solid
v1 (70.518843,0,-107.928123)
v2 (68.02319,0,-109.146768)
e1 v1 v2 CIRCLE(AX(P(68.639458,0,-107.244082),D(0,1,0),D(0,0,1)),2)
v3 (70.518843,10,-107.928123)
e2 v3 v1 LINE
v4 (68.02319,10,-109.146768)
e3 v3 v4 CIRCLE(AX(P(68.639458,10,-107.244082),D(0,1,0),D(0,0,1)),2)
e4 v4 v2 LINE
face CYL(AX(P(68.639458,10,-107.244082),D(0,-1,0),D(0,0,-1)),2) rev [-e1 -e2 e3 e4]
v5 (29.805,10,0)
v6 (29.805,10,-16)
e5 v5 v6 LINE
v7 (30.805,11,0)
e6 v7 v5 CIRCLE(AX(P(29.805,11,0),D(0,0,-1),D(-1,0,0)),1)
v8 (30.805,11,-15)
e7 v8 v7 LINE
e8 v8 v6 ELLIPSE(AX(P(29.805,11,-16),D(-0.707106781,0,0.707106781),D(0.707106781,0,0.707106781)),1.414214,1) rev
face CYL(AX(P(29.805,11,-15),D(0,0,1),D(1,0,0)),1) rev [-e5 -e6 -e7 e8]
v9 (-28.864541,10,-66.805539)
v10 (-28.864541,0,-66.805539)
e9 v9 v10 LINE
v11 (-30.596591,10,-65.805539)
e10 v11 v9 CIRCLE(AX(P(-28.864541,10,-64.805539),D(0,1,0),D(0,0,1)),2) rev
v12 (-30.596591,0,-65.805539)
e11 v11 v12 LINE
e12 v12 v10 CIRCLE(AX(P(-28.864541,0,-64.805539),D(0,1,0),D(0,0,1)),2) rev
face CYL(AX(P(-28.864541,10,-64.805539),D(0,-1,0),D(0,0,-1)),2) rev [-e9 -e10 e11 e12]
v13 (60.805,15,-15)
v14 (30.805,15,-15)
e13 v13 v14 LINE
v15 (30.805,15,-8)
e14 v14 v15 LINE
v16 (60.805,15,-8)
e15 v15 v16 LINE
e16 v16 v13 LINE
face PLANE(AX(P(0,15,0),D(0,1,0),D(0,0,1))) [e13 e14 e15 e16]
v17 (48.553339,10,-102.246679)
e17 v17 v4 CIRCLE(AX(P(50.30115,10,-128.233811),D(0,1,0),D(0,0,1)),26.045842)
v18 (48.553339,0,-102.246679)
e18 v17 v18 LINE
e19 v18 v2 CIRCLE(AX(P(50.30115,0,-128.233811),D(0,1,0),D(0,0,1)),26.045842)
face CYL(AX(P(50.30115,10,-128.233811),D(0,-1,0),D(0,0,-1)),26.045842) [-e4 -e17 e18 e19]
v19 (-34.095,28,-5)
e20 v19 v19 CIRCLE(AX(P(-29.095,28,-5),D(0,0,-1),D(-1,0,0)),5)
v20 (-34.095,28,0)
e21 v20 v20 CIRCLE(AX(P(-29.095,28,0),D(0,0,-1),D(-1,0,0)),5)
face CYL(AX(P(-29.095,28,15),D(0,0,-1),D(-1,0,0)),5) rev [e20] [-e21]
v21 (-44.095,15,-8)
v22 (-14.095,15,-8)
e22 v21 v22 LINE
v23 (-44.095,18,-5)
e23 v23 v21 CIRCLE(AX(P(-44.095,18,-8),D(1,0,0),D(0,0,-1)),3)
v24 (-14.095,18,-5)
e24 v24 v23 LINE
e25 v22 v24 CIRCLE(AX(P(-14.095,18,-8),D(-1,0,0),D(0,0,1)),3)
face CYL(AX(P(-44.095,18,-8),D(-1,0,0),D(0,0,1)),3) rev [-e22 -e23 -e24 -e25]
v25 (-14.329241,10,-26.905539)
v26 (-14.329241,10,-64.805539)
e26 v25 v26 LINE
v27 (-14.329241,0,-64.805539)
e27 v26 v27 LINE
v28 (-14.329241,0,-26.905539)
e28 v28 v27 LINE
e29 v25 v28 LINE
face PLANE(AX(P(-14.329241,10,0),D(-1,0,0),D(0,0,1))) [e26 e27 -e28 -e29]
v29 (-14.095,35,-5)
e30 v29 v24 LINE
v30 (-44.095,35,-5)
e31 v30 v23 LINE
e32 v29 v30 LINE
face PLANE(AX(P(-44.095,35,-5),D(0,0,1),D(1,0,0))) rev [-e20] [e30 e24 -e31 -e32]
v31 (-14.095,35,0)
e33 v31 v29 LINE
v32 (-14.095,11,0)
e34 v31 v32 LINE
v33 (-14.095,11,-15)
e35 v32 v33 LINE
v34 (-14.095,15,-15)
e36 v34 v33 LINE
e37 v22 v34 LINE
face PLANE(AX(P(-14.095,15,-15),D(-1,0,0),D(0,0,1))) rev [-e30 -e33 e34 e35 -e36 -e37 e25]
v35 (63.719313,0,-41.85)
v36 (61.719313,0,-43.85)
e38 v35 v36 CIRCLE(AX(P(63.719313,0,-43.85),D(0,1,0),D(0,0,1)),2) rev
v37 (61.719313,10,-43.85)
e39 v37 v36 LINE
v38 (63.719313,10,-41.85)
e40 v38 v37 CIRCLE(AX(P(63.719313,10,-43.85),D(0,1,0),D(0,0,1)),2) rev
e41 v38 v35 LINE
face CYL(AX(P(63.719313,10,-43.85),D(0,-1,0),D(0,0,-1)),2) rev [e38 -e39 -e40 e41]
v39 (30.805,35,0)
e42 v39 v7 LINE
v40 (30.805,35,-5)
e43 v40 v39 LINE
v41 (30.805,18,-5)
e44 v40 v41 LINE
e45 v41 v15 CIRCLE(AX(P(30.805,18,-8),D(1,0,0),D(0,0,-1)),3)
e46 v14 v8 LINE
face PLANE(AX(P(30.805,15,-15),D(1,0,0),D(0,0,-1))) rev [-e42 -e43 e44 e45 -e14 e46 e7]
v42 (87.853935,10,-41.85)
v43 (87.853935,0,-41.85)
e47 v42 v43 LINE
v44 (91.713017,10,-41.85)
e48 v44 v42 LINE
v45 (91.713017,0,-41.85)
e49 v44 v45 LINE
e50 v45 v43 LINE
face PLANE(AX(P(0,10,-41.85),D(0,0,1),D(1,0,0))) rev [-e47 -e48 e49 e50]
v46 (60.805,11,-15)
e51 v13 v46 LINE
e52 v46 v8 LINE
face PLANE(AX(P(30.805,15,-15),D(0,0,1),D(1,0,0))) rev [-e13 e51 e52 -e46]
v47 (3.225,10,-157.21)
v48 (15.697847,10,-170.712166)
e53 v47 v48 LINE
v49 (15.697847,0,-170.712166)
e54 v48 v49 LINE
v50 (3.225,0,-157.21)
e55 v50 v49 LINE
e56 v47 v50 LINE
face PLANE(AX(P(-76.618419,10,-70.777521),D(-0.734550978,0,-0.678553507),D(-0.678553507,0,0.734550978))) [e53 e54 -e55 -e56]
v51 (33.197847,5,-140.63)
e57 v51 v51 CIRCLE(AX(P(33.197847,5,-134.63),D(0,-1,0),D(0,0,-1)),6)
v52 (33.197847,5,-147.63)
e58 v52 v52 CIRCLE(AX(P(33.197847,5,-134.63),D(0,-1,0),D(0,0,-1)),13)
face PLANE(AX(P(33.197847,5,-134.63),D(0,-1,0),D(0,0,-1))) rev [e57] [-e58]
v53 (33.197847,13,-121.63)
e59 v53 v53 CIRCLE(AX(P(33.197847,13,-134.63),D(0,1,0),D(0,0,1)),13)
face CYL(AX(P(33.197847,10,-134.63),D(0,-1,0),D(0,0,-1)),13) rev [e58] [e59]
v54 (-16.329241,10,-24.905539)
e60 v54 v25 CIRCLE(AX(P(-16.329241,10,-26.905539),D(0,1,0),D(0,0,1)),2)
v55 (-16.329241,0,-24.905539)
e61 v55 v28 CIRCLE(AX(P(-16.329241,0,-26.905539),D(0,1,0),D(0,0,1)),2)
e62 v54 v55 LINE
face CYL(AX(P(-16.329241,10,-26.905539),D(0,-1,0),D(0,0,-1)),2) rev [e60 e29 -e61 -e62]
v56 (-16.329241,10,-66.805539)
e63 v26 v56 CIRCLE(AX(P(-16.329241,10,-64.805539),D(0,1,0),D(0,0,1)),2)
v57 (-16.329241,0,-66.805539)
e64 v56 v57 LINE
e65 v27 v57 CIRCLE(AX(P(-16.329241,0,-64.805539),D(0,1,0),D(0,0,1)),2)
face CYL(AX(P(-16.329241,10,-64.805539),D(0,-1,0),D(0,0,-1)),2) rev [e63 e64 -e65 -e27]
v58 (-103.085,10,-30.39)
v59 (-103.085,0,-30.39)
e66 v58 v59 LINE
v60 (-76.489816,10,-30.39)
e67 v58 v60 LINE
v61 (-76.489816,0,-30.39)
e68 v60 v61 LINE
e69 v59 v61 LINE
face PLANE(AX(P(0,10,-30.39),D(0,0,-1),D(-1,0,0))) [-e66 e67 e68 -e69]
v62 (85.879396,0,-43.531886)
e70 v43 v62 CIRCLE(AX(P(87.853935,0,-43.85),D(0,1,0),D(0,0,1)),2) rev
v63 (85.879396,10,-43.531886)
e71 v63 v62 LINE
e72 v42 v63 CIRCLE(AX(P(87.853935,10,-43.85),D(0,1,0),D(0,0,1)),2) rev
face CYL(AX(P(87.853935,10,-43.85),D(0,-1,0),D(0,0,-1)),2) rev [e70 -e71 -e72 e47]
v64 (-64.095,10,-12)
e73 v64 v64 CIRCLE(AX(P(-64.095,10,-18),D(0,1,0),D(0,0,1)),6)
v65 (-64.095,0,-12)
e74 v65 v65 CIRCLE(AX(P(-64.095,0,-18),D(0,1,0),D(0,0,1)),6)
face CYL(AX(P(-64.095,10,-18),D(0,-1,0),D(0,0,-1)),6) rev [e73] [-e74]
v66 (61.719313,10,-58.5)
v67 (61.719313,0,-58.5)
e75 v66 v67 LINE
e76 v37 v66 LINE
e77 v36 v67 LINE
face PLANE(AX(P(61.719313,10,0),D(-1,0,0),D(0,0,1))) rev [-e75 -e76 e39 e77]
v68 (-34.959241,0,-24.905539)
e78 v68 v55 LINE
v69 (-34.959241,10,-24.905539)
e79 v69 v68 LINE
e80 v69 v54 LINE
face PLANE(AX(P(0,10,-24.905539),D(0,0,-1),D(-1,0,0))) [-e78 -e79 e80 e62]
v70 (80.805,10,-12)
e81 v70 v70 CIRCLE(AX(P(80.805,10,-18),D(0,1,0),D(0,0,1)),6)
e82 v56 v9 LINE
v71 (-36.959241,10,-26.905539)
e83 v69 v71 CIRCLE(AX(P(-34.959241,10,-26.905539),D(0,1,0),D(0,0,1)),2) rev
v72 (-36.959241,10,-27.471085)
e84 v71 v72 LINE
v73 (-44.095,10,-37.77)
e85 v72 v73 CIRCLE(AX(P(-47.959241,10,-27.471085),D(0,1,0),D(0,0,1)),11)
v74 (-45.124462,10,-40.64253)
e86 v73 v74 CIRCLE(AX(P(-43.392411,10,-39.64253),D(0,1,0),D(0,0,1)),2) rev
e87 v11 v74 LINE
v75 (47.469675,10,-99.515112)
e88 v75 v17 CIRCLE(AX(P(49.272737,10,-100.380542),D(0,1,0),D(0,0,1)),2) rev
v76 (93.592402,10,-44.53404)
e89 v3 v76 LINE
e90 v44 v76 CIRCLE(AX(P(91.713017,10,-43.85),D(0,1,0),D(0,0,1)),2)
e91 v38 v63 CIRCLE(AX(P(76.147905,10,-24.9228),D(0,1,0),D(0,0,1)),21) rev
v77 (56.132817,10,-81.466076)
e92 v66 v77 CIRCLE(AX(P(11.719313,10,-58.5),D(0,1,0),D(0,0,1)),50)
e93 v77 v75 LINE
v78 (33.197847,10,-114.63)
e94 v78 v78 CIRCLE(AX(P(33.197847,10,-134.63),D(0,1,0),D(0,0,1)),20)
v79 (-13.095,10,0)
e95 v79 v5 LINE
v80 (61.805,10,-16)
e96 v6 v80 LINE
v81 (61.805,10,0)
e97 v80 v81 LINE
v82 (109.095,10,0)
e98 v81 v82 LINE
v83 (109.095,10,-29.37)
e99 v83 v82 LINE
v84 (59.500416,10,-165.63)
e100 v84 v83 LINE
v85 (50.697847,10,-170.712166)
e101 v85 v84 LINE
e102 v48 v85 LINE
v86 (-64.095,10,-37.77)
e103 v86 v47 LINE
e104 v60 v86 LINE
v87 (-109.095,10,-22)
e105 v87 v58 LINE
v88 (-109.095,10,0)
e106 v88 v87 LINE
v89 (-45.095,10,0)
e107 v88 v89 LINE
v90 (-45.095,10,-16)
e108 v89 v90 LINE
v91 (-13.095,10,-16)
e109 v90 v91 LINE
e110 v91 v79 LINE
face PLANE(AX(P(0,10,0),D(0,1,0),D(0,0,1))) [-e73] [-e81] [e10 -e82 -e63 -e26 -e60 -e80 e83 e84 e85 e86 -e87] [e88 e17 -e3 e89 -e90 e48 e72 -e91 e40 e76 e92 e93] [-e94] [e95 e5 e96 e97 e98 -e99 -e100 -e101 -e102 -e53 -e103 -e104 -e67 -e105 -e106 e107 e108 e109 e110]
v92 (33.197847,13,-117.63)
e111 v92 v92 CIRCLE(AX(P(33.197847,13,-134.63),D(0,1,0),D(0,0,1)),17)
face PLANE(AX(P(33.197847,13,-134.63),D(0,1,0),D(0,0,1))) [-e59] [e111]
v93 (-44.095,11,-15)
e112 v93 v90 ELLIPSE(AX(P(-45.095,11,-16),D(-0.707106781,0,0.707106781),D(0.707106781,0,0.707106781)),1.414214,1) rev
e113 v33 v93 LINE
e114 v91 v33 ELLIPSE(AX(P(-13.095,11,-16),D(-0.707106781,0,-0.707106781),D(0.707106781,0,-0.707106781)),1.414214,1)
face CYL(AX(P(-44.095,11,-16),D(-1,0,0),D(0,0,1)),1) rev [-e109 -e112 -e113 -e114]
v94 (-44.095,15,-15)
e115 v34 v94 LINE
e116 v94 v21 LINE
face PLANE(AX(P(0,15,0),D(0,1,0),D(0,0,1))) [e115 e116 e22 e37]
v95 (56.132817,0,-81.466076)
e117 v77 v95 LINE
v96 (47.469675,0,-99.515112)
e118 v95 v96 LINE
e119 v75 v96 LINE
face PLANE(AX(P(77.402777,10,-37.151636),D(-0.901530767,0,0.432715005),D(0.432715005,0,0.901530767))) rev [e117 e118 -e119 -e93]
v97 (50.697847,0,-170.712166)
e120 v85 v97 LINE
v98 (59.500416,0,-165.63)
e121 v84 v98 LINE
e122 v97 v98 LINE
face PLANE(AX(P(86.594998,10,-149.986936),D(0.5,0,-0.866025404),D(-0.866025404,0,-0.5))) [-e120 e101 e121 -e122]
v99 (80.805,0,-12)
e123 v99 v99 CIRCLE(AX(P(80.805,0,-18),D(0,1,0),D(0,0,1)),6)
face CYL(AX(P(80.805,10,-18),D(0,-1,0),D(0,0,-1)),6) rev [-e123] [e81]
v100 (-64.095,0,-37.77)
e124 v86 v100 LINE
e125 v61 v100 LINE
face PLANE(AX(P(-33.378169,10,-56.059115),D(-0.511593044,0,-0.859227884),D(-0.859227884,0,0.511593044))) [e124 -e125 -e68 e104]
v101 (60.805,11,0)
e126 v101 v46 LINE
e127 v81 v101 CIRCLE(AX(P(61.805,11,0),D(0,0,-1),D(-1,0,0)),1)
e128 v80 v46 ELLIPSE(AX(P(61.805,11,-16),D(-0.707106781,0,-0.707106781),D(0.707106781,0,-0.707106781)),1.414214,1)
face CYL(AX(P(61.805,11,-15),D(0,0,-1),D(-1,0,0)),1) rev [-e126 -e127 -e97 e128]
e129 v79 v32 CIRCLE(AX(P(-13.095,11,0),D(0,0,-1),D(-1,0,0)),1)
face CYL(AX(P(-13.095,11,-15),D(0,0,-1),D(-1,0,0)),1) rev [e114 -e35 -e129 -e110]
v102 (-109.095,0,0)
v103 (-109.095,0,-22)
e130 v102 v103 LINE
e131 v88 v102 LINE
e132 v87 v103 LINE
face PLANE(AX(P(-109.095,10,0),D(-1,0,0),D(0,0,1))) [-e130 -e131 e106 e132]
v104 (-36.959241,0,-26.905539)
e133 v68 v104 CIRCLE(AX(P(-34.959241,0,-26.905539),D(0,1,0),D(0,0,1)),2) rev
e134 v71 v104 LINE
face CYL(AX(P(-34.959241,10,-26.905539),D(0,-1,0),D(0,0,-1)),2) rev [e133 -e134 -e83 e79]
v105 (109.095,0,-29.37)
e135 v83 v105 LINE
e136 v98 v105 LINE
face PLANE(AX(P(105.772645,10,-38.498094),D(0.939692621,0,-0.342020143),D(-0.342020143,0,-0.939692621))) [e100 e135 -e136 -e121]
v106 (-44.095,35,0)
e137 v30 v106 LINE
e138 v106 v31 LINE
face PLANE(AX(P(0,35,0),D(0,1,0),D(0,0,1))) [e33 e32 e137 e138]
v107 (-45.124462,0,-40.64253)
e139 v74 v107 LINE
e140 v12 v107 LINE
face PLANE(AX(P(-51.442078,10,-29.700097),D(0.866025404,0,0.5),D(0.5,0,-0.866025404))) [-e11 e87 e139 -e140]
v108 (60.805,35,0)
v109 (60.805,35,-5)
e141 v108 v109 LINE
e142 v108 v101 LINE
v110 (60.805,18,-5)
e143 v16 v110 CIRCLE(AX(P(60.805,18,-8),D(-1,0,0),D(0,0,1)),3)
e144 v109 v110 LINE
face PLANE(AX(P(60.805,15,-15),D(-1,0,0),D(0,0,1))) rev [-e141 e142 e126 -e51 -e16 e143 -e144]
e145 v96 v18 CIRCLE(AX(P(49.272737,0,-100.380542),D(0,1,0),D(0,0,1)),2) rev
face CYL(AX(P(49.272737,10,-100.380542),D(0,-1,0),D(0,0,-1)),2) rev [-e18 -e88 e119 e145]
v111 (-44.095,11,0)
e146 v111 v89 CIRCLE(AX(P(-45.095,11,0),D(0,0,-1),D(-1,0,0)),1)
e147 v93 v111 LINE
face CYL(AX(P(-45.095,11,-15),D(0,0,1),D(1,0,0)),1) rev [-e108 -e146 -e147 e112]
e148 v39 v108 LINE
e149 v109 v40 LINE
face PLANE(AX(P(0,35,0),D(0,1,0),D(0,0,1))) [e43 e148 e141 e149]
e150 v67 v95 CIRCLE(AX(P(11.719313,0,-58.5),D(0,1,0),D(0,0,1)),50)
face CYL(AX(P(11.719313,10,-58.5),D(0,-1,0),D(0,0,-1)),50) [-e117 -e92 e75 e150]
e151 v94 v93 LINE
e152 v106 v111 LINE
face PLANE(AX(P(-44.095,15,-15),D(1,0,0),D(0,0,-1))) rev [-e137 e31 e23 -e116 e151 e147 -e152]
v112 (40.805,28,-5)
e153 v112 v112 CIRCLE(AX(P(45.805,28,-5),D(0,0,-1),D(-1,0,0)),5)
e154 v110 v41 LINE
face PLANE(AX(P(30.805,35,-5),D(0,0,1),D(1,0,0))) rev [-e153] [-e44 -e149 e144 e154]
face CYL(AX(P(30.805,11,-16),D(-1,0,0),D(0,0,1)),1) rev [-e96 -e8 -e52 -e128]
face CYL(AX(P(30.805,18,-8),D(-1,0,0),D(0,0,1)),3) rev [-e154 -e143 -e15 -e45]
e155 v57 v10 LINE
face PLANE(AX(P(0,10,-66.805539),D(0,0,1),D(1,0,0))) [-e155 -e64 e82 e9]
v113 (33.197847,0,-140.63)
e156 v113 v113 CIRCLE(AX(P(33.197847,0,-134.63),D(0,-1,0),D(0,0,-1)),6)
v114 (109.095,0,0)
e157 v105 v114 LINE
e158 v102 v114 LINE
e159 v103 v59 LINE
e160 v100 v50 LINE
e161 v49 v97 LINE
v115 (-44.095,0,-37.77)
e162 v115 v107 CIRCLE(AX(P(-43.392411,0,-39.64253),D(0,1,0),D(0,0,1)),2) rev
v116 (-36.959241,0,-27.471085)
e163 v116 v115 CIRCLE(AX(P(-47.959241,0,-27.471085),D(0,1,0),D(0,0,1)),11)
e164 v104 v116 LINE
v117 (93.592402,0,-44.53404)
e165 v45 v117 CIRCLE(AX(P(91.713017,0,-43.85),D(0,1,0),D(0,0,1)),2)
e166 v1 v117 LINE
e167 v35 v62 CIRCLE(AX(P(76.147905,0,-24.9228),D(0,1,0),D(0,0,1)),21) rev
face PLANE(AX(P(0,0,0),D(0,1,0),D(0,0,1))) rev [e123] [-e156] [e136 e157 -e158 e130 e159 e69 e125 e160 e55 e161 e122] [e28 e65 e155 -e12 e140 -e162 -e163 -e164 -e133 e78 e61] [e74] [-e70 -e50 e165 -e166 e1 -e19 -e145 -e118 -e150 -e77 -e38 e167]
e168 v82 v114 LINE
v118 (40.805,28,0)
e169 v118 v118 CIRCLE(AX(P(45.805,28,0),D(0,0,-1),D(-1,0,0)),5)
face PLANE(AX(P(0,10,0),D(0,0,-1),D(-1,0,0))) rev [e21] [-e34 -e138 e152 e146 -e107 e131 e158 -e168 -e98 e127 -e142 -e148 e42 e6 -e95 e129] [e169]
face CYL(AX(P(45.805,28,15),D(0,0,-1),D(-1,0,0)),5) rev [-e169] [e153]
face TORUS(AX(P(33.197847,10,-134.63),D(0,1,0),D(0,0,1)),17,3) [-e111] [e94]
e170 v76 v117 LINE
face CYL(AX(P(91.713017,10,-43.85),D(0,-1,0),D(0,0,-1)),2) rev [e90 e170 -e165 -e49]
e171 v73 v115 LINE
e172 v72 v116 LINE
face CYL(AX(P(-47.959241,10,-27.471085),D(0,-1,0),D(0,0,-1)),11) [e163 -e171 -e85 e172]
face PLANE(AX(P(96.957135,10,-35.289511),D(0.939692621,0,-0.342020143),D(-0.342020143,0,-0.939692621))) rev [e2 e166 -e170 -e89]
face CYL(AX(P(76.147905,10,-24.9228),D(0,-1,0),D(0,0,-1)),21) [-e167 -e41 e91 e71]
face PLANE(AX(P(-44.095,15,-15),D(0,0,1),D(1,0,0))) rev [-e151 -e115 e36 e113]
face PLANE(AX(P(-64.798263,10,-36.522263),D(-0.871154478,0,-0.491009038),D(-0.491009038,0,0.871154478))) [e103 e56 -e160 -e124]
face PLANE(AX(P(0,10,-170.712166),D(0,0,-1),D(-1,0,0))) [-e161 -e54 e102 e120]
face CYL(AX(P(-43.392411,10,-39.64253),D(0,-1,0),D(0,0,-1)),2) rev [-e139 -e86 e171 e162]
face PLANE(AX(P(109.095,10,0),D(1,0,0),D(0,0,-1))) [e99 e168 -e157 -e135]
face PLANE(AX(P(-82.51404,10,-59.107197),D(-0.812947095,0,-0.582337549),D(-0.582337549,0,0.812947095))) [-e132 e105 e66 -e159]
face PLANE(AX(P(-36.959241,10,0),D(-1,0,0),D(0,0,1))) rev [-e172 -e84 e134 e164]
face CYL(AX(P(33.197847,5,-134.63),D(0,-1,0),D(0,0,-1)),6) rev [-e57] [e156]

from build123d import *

# Parameters (mm, degrees)
CROQUIS1_R              = 13
CROQUIS1_R_2            = 6
SALIENTE_EXTRUIR1_DEPTH = 10
CROQUIS2_W              = 30
CROQUIS2_H              = 15
SALIENTE_EXTRUIR2_DEPTH = 5
CROQUIS3_W              = 30
CROQUIS3_H              = 5
SALIENTE_EXTRUIR3_DEPTH = 20
CROQUIS4_R              = 5
CORTAR_EXTRUIR1_DEPTH   = 20
REDONDEO1_R             = 1
REDONDEO2_R             = 1
REDONDEO3_R             = 3
CROQUIS5_R              = 13
CROQUIS5_R_2            = 6
SALIENTE_EXTRUIR4_DEPTH = 5
CROQUIS6_R              = 20
CROQUIS6_R_2            = 13
SALIENTE_EXTRUIR5_DEPTH = 3
REDONDEO4_R             = 3


with BuildPart() as part:
    # Croquis1 → Saliente-Extruir1 (new body)
    with BuildSketch(Plane(origin=(0, 0, 0), x_dir=(1, 0, 0), z_dir=(0, 1, 0))):
        Polygon((-109.095, 0), (109.095, 0), (109.095, 29.37), (59.500415879, 165.63), (50.697846821, 170.712165615), (15.697846821, 170.712165615), (3.225, 157.21), (-64.095, 37.77), (-76.489816261, 30.39), (-103.085, 30.39), (-109.095, 22), align=None)
        with Locations(Location((33.197846821, 134.63, 0), (0, 0, 270))):
            Circle(CROQUIS1_R, mode=Mode.SUBTRACT)
        with Locations(Location((-64.095, 18, 0), (0, 0, 270))):
            Circle(CROQUIS1_R_2, mode=Mode.SUBTRACT)
        with Locations(Location((80.805, 18, 0), (0, 0, 270))):
            Circle(CROQUIS1_R_2, mode=Mode.SUBTRACT)
        with BuildLine():
            Line((-34.959241143, 24.905539046), (-16.329241143, 24.905539046))
            ThreePointArc((-16.329241143, 24.905539046), (-14.915027581, 25.491325484), (-14.329241143, 26.905539046))
            Line((-14.329241143, 26.905539046), (-14.329241143, 64.805539046))
            ThreePointArc((-14.329241143, 64.805539046), (-14.915027581, 66.219752609), (-16.329241143, 66.805539046))
            Line((-16.329241143, 66.805539046), (-28.864540605, 66.805539046))
            ThreePointArc((-28.864540605, 66.805539046), (-29.864540605, 66.537589854), (-30.596591412, 65.805539046))
            Line((-30.596591412, 65.805539046), (-45.124461509, 40.642529914))
            ThreePointArc((-45.124461509, 40.642529914), (-45.275154746, 38.967789325), (-44.095, 37.77))
            ThreePointArc((-44.095, 37.77), (-38.917486541, 33.735802046), (-36.959241143, 27.471085475))
            Line((-36.959241143, 27.471085475), (-36.959241143, 26.905539046))
            ThreePointArc((-36.959241143, 26.905539046), (-36.373454706, 25.491325484), (-34.959241143, 24.905539046))
        make_face(mode=Mode.SUBTRACT)
        with BuildLine():
            Line((70.518843068, 107.928122629), (93.592402069, 44.534040287))
            ThreePointArc((93.592402069, 44.534040287), (93.351320916, 42.702847127), (91.713016828, 41.85))
            Line((91.713016828, 41.85), (87.853935228, 41.85))
            ThreePointArc((87.853935228, 41.85), (86.557059698, 42.32746466), (85.879396403, 43.53188614))
            ThreePointArc((85.879396403, 43.53188614), (74.558636842, 45.862576394), (63.719312841, 41.85))
            ThreePointArc((63.719312841, 41.85), (62.305099279, 42.435786438), (61.719312841, 43.85))
            Line((61.719312841, 43.85), (61.719312841, 58.5))
            ThreePointArc((61.719312841, 58.5), (60.302618614, 70.31788476), (56.132816833, 81.466076355))
            Line((56.132816833, 81.466076355), (47.469675424, 99.515111912))
            ThreePointArc((47.469675424, 99.515111912), (47.413687511, 101.118061517), (48.553338923, 102.246678699))
            ThreePointArc((48.553338923, 102.246678699), (59.00154122, 103.684084154), (68.023190025, 109.146768338))
            ThreePointArc((68.023190025, 109.146768338), (69.517034466, 109.041263258), (70.518843068, 107.928122629))
        make_face(mode=Mode.SUBTRACT)
    extrude(amount=SALIENTE_EXTRUIR1_DEPTH)

    # Croquis2 → Saliente-Extruir2 (add)
    with BuildSketch(Plane(origin=(0, 10, 0), x_dir=(1, 0, 0), z_dir=(0, 1, 0))):
        with Locations((-29.095, 7.5)):
            Rectangle(CROQUIS2_W, CROQUIS2_H)
        with Locations((45.805, 7.5)):
            Rectangle(CROQUIS2_W, CROQUIS2_H)
    extrude(amount=SALIENTE_EXTRUIR2_DEPTH)

    # Croquis3 → Saliente-Extruir3 (add)
    with BuildSketch(Plane(origin=(0, 15, 0), x_dir=(1, 0, 0), z_dir=(0, 1, 0))):
        with Locations((-29.095, 2.5)):
            Rectangle(CROQUIS3_W, CROQUIS3_H)
        with Locations((45.805, 2.5)):
            Rectangle(CROQUIS3_W, CROQUIS3_H)
    extrude(amount=SALIENTE_EXTRUIR3_DEPTH)

    # Croquis4 → Cortar-Extruir1 (cut)
    with BuildSketch(Plane(origin=(0, 0, -5), x_dir=(-1, 0, 0), z_dir=(0, 0, -1))):
        with Locations((-45.805, 28)):
            Circle(CROQUIS4_R)
        with Locations((29.095, 28)):
            Circle(CROQUIS4_R)
    extrude(amount=-CORTAR_EXTRUIR1_DEPTH, mode=Mode.SUBTRACT)

    # Redondeo1
    redondeo1_edges = [part.edges().sort_by_distance(p)[0] for p in [
        (-14.095, 10, -7.5),
        (-44.095, 10, -7.5),
        (60.805, 10, -7.5),
        (30.805, 10, -7.5),
    ]]
    fillet(redondeo1_edges, radius=REDONDEO1_R)

    # Redondeo2
    redondeo2_edges = [part.edges().sort_by_distance(p)[0] for p in [
        (45.805, 10, -15),
        (-29.095, 10, -15),
    ]]
    fillet(redondeo2_edges, radius=REDONDEO2_R)

    # Redondeo3
    redondeo3_edges = [part.edges().sort_by_distance(p)[0] for p in [
        (-29.095, 15, -5),
        (45.805, 15, -5),
    ]]
    fillet(redondeo3_edges, radius=REDONDEO3_R)

    # Croquis5 → Saliente-Extruir4 (add)
    with BuildSketch(Plane.XZ):
        with Locations(Location((33.197846821, -134.63, 0), (0, 0, 270))):
            Circle(CROQUIS5_R)
        with Locations(Location((33.197846821, -134.63, 0), (0, 0, 270))):
            Circle(CROQUIS5_R_2, mode=Mode.SUBTRACT)
    extrude(amount=-SALIENTE_EXTRUIR4_DEPTH)

    # Croquis6 → Saliente-Extruir5 (add)
    with BuildSketch(Plane(origin=(0, 10, 0), x_dir=(1, 0, 0), z_dir=(0, 1, 0))):
        with Locations(Location((33.197846821, 134.63, 0), (0, 0, 270))):
            Circle(CROQUIS6_R)
        with Locations(Location((33.197846821, 134.63, 0), (0, 0, 90))):
            Circle(CROQUIS6_R_2, mode=Mode.SUBTRACT)
    extrude(amount=SALIENTE_EXTRUIR5_DEPTH)

    # Redondeo4
    redondeo4_edges = [part.edges().sort_by_distance(p)[0] for p in [
        (33.197846821, 13, -154.63),
    ]]
    fillet(redondeo4_edges, radius=REDONDEO4_R - 0.0001)  # a hair under: the kernel refuses the full size


solid = part.part
